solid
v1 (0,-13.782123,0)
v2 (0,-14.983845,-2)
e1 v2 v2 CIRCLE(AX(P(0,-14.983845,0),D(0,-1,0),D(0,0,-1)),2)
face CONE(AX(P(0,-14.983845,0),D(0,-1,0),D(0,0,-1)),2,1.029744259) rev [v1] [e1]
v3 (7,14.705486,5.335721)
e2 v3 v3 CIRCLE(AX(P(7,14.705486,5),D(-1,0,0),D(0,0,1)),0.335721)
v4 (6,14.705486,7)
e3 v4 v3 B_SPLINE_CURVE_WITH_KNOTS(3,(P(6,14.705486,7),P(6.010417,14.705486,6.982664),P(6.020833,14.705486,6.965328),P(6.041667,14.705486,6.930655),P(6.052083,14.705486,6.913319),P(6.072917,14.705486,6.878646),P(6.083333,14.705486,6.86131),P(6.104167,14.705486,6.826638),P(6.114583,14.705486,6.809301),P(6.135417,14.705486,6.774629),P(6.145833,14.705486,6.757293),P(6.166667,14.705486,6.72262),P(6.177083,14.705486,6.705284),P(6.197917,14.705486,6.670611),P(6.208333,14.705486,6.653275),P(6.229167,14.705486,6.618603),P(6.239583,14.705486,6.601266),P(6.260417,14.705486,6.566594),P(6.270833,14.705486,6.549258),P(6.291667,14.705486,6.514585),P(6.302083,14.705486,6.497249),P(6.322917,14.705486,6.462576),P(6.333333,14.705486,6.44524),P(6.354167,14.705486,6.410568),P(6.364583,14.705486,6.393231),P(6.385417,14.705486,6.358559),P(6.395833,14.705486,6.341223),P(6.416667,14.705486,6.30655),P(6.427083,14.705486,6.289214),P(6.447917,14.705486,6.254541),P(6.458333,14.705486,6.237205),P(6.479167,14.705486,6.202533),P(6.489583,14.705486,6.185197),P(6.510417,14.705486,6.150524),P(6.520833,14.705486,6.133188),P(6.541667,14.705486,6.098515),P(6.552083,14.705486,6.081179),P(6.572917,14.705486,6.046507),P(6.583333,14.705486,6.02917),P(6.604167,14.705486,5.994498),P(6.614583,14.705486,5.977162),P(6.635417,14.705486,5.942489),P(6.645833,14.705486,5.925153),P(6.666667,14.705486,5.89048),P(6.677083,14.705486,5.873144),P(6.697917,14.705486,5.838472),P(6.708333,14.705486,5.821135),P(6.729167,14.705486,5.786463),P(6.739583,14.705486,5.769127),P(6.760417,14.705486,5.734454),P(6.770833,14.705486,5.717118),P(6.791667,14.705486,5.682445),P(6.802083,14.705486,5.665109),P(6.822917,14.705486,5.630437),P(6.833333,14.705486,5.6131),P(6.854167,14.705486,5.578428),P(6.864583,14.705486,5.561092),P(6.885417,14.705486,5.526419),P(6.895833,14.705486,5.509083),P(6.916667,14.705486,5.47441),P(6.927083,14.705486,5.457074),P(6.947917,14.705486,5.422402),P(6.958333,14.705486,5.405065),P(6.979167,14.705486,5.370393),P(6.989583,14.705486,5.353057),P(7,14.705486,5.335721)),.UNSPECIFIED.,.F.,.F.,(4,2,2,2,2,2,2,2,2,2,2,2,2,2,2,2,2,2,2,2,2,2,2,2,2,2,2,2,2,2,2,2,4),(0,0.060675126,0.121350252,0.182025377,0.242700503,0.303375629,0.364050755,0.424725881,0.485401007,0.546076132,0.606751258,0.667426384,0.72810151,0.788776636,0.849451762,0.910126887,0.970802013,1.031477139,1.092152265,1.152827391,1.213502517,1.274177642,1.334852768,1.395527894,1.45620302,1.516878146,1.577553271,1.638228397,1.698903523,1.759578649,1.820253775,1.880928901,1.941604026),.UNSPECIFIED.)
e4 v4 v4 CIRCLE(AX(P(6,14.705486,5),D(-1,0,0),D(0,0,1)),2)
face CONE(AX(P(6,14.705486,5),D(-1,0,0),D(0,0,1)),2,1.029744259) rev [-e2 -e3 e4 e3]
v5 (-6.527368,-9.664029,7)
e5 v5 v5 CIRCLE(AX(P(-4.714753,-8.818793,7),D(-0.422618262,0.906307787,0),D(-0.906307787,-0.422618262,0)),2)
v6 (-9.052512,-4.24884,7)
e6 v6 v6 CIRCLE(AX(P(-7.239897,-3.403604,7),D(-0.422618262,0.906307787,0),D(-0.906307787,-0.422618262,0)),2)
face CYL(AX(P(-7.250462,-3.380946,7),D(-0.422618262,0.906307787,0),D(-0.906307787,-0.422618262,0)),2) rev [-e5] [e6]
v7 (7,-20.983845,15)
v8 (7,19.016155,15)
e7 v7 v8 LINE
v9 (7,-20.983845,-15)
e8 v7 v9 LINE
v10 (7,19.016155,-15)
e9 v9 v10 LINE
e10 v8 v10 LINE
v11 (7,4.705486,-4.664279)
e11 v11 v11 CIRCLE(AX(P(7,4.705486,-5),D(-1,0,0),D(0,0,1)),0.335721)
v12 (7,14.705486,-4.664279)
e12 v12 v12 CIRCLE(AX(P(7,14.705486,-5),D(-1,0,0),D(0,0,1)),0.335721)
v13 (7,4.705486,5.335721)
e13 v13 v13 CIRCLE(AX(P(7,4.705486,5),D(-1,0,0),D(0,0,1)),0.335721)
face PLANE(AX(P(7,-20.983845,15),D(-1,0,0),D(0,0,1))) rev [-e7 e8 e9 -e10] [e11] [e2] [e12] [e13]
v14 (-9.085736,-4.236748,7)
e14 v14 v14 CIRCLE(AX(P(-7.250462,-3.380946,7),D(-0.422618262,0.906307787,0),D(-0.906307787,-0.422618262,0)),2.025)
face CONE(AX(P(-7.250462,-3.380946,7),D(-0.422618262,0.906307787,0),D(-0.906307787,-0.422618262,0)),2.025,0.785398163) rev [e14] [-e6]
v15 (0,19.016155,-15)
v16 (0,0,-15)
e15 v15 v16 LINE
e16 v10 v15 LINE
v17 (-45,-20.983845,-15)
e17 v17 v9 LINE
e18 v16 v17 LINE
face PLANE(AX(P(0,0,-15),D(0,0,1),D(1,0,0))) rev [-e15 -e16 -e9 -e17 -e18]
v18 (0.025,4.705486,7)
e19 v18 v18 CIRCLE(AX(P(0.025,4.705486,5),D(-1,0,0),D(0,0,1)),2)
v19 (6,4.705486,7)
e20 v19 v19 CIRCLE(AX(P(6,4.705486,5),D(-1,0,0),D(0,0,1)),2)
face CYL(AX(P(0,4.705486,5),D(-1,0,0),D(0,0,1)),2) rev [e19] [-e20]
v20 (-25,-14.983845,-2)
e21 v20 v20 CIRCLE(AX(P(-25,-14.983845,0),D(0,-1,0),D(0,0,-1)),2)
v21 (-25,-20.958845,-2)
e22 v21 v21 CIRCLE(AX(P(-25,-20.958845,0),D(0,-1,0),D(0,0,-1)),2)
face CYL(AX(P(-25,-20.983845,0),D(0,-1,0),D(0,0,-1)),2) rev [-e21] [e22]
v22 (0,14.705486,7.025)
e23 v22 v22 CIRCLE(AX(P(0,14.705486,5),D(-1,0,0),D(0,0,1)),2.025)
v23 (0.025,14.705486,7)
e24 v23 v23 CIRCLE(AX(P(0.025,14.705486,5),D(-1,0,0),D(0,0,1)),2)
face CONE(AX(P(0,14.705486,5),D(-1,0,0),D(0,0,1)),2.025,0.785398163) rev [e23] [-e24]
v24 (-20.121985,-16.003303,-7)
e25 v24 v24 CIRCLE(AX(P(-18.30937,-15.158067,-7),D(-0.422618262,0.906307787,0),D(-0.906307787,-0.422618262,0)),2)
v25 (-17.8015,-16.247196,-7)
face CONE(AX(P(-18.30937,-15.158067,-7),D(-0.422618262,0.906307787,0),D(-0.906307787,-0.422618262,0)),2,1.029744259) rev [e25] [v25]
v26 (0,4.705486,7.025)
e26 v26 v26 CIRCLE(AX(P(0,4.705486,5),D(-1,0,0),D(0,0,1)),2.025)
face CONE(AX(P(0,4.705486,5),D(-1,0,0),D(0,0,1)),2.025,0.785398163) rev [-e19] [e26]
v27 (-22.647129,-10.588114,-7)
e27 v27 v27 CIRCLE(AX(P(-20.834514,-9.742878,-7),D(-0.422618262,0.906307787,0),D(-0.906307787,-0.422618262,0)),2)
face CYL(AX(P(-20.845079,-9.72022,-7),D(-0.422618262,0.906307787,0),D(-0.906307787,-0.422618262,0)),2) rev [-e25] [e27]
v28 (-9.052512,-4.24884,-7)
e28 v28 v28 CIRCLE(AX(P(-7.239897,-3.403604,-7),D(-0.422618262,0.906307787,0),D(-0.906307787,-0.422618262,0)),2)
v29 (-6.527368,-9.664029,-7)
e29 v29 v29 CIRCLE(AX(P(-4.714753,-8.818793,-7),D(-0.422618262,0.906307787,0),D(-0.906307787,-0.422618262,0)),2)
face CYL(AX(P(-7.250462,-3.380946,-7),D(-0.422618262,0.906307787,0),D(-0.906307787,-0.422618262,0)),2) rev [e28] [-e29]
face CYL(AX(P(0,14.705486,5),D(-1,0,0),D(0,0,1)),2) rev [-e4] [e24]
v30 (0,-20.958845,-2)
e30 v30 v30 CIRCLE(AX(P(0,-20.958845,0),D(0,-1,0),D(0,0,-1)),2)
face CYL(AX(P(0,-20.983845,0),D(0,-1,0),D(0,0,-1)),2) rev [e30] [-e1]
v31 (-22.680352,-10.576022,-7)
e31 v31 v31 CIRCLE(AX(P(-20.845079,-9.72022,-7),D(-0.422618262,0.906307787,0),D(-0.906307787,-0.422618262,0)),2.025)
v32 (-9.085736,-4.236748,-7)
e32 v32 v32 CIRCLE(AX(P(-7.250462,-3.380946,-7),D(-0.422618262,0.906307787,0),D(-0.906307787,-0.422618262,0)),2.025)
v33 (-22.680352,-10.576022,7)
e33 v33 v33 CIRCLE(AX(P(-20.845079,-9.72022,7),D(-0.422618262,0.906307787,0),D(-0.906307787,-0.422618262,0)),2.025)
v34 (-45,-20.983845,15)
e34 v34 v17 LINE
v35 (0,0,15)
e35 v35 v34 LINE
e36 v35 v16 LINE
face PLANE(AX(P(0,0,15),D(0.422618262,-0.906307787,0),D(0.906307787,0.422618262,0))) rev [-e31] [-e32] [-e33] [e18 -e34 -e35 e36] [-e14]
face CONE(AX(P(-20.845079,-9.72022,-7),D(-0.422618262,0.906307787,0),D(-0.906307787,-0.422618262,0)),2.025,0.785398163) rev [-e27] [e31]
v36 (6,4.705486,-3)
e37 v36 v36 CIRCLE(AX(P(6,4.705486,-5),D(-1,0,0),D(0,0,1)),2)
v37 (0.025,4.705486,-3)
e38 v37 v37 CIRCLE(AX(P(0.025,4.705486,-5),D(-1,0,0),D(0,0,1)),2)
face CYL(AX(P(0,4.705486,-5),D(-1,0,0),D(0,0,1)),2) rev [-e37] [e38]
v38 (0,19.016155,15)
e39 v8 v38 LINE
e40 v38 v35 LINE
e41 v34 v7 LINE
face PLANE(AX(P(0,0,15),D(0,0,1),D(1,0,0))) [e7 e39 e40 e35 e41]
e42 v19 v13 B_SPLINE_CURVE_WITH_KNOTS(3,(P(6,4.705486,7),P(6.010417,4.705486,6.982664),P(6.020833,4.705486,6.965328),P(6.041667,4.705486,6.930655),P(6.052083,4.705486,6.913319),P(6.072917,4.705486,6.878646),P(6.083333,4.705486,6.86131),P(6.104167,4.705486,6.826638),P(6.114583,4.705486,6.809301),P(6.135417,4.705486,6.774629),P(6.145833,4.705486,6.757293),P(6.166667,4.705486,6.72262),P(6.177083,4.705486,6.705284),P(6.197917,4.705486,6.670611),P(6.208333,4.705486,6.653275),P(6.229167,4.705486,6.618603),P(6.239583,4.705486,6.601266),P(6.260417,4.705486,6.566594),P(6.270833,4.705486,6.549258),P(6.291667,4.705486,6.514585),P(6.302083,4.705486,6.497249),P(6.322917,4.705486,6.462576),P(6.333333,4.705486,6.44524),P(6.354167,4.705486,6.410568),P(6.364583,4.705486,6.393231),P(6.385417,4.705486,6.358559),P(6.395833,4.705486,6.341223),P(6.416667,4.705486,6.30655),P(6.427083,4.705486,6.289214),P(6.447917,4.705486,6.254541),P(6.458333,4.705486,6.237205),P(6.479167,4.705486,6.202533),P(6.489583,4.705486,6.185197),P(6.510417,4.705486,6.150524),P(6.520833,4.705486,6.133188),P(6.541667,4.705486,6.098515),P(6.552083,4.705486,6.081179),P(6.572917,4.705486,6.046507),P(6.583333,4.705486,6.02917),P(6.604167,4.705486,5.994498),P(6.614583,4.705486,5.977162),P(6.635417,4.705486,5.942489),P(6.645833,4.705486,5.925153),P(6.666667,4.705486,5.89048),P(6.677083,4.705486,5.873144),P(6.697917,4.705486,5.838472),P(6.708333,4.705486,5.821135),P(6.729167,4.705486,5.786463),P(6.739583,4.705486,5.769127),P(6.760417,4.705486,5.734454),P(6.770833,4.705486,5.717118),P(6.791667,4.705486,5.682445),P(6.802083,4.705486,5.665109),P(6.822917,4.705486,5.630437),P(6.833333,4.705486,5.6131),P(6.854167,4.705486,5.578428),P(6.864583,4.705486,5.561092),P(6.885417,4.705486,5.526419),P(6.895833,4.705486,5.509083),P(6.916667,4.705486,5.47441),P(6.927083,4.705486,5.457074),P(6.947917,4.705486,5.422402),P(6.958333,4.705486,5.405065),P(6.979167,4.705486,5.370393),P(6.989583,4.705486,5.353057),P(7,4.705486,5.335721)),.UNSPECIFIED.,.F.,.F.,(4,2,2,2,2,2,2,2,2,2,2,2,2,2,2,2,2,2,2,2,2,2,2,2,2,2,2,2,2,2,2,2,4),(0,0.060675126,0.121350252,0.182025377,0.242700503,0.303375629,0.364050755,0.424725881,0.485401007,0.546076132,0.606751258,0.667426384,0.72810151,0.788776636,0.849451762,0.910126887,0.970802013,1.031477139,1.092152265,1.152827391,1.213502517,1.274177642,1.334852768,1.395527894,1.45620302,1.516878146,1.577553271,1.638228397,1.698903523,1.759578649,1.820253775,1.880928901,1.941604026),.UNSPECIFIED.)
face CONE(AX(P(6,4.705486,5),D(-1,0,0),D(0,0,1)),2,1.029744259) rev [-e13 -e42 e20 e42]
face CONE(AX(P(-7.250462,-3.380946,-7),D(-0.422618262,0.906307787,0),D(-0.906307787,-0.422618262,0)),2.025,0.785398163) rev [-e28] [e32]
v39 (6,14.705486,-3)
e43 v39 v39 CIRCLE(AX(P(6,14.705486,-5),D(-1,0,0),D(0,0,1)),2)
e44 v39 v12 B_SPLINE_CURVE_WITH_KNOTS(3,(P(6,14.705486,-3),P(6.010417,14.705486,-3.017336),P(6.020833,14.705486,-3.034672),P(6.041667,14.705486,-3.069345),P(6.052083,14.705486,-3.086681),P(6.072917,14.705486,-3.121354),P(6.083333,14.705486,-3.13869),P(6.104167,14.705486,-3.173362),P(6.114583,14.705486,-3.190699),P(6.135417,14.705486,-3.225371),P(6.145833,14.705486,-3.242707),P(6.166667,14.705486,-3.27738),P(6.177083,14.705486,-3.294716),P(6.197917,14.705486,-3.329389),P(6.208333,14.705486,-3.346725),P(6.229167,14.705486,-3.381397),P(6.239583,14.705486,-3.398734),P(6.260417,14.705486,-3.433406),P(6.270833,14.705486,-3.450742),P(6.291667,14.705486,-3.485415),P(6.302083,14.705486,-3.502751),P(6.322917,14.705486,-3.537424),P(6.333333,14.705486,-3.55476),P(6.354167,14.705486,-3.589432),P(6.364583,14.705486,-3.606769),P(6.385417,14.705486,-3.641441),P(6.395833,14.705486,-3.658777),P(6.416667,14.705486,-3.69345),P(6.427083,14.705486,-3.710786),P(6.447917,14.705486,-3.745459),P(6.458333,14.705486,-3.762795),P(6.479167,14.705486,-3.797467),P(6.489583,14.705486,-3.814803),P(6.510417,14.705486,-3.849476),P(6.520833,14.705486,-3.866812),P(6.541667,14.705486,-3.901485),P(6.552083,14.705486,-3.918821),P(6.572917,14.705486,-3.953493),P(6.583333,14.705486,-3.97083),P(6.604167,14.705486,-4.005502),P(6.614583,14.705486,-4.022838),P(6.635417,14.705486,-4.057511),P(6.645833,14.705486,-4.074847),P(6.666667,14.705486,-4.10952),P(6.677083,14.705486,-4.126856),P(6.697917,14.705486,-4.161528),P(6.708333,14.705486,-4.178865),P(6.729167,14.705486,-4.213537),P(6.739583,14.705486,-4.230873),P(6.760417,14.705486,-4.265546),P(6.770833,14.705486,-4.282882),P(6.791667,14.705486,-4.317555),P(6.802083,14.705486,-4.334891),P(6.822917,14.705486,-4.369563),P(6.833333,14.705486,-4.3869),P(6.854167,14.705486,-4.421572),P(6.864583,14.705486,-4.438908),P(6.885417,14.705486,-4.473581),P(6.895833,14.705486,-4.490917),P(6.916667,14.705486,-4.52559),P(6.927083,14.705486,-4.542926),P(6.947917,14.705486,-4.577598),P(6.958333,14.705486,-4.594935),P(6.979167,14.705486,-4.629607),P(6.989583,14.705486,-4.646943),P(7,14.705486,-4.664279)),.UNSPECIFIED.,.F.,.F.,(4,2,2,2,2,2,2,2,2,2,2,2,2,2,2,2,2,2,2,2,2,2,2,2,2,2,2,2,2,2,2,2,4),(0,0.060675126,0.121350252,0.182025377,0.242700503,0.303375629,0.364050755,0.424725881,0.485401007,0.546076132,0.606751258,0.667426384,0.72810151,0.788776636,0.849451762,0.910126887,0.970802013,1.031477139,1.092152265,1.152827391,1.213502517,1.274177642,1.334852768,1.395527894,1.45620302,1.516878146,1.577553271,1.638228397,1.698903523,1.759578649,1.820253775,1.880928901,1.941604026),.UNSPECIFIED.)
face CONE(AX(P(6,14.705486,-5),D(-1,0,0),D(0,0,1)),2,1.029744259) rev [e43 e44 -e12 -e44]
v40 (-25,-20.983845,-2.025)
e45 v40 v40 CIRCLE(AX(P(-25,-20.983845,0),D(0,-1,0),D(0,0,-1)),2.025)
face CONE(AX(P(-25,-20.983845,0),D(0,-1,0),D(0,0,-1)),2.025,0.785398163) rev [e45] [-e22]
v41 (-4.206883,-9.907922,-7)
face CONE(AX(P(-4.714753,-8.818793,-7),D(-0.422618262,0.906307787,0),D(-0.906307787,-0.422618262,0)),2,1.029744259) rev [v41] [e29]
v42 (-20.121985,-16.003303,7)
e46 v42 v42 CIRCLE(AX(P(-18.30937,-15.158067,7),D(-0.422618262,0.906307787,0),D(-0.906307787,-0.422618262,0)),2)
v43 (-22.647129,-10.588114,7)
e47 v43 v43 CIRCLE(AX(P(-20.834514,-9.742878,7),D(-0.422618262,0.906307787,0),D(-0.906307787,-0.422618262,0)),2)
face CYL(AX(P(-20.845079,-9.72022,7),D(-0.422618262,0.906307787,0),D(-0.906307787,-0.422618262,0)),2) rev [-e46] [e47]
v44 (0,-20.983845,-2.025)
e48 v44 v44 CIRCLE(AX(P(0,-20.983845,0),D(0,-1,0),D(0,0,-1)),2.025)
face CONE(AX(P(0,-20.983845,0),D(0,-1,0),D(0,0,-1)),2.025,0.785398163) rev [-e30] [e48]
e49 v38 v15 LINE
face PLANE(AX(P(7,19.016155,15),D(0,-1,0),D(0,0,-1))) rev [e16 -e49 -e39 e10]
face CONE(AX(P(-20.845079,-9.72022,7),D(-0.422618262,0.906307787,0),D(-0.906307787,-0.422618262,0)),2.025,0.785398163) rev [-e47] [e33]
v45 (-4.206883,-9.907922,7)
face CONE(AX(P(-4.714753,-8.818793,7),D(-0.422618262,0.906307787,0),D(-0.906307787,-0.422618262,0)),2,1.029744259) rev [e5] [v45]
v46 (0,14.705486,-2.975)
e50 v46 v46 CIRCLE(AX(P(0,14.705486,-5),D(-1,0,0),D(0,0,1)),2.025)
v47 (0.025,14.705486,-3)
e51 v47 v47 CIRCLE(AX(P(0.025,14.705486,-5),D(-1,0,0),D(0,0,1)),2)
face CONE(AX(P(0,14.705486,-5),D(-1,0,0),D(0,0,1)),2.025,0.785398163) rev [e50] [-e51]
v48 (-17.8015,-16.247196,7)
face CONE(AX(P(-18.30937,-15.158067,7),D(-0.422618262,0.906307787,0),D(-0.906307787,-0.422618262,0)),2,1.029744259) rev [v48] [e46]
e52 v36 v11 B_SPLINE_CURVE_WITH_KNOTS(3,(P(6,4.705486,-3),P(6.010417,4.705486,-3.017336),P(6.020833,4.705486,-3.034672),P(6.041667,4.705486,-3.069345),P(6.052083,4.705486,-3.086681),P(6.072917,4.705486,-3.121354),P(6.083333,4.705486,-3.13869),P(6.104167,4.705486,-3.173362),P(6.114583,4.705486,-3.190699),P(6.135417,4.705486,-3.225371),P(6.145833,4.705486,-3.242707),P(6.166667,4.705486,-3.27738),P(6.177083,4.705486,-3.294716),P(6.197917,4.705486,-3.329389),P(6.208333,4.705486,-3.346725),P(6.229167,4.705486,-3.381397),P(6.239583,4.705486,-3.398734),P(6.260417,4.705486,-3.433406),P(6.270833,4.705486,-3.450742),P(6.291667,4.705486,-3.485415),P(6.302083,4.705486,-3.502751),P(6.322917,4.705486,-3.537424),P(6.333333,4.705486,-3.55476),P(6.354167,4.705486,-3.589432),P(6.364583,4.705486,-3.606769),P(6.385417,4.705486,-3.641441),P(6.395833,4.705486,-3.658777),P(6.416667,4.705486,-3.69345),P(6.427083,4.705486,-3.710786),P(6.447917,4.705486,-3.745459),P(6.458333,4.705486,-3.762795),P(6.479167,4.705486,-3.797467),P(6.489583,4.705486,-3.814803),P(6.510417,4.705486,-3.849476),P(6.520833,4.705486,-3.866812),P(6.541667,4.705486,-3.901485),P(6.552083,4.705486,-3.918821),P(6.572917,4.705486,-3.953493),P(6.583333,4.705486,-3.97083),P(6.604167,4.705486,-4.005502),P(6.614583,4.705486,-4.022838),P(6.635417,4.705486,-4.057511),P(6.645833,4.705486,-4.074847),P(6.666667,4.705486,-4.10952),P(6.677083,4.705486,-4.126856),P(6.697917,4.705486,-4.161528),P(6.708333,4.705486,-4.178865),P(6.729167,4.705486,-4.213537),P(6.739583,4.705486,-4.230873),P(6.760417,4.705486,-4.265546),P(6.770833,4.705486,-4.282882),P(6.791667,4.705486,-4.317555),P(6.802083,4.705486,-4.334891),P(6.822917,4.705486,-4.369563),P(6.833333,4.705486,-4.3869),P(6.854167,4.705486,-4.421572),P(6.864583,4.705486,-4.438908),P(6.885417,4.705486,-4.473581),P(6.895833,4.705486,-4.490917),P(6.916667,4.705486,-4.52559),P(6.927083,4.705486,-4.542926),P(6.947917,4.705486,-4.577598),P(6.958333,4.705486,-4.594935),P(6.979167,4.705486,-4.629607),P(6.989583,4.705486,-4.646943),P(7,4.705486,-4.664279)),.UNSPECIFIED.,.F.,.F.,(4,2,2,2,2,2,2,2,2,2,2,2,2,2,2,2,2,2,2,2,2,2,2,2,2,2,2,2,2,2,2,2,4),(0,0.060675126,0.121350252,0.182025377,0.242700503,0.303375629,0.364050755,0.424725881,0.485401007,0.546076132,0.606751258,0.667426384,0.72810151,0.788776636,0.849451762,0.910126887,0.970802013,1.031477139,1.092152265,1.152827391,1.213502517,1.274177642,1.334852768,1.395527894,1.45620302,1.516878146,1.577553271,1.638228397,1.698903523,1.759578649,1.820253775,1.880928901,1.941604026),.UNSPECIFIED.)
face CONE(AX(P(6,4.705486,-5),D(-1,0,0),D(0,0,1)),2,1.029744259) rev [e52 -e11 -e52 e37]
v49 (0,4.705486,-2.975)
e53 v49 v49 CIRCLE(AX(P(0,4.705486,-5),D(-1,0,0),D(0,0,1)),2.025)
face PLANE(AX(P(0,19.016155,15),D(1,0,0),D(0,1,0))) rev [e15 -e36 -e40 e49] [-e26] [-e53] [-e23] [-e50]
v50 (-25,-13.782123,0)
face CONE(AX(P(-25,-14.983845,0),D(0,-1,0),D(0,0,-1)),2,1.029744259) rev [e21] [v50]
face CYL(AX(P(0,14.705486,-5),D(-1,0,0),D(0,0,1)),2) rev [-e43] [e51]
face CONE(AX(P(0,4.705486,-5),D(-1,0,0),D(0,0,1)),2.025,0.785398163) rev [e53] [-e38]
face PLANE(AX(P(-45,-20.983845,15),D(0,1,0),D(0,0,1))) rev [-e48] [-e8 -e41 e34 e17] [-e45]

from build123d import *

# Parameters (mm, degrees)
BOSS_EXTRUDE1_DEPTH             = 15
F_4_0MM_DOWEL_HOLE1_D           = 4
F_4_0MM_DOWEL_HOLE1_DEPTH       = 6
F_4_0MM_DOWEL_HOLE1_CSINK_D     = 4.05
F_4_0MM_DOWEL_HOLE1_CSINK_ANGLE = 90
F_4_0MM_DOWEL_HOLE1_TIP         = 1.201721238
F_4_0MM_DOWEL_HOLE3_D           = 4
F_4_0MM_DOWEL_HOLE3_DEPTH       = 6
F_4_0MM_DOWEL_HOLE3_CSINK_D     = 4.05
F_4_0MM_DOWEL_HOLE3_CSINK_ANGLE = 90
F_4_0MM_DOWEL_HOLE3_TIP         = 1.201721238


# Read off the part's stored shape, not the designer's step: Ø4.0mm Dowel Hole4
with BuildPart() as part:
    # Sketch1 → Boss-Extrude1 (new, symmetric)
    with BuildSketch(Plane.XY):
        Polygon((0, 19.016155383), (0, 0), (-45, -20.983844617), (7, -20.983844617), (7, 19.016155383), align=None)
    extrude(amount=BOSS_EXTRUDE1_DEPTH, both=True)

    # Ø4.0mm Dowel Hole1
    with Locations(Plane(origin=(0, -20.983844617, 0), x_dir=(-1, 0, 0), z_dir=(0, -1, 0))):
        with Locations((0, 0), (25, 0)):
            CounterSinkHole(F_4_0MM_DOWEL_HOLE1_D / 2, F_4_0MM_DOWEL_HOLE1_CSINK_D / 2, depth=F_4_0MM_DOWEL_HOLE1_DEPTH, counter_sink_angle=F_4_0MM_DOWEL_HOLE1_CSINK_ANGLE)
            with Locations((0, 0, -(F_4_0MM_DOWEL_HOLE1_DEPTH + F_4_0MM_DOWEL_HOLE1_TIP / 2))):  # 118° drill point
                Cone(0, F_4_0MM_DOWEL_HOLE1_D / 2, F_4_0MM_DOWEL_HOLE1_TIP, mode=Mode.SUBTRACT)

    # Ø4.0mm Dowel Hole3
    with Locations(Plane(origin=(0, 0, 0), x_dir=(0.9063077870366525, 0.422618261740694, 0), z_dir=(-0.422618261740694, 0.9063077870366525, 0))):
        with Locations((-23, 7), (-8, 7), (-8, -7), (-23, -7)):
            CounterSinkHole(F_4_0MM_DOWEL_HOLE3_D / 2, F_4_0MM_DOWEL_HOLE3_CSINK_D / 2, depth=F_4_0MM_DOWEL_HOLE3_DEPTH, counter_sink_angle=F_4_0MM_DOWEL_HOLE3_CSINK_ANGLE)
            with Locations((0, 0, -(F_4_0MM_DOWEL_HOLE3_DEPTH + F_4_0MM_DOWEL_HOLE3_TIP / 2))):  # 118° drill point
                Cone(0, F_4_0MM_DOWEL_HOLE3_D / 2, F_4_0MM_DOWEL_HOLE3_TIP, mode=Mode.SUBTRACT)

    # Ø4.0mm Dowel Hole4 outline → Ø4.0mm Dowel Hole4 (revolve, cut)
    with BuildSketch(Plane(origin=(0, 4.705485654, 5), x_dir=(0, 1, 0), z_dir=(0, 0, -1))):
        Polygon((0, 0), (2.025, 0), (2, 0.025), (2, 6), (0.335720518, 7), (0, 7), align=None)
    revolve(axis=Axis((0, 4.705485654, 5), (1, 0, 0)), mode=Mode.SUBTRACT)

    # 4.0mm Dowel Hole4 2 outline → 4.0mm Dowel Hole4 2 (revolve, cut)
    with BuildSketch(Plane(origin=(0, 14.705485654, -5), x_dir=(0, 1, 0), z_dir=(0, 0, -1))):
        Polygon((0, 0), (2.025, 0), (2, 0.025), (2, 6), (0.335720518, 7), (0, 7), align=None)
    revolve(axis=Axis((0, 14.705485654, -5), (1, 0, 0)), mode=Mode.SUBTRACT)

    # 4.0mm Dowel Hole4 3 outline → 4.0mm Dowel Hole4 3 (revolve, cut)
    with BuildSketch(Plane(origin=(0, 4.705485654, -5), x_dir=(0, 1, 0), z_dir=(0, 0, -1))):
        Polygon((0, 0), (2.025, 0), (2, 0.025), (2, 6), (0.335720518, 7), (0, 7), align=None)
    revolve(axis=Axis((0, 4.705485654, -5), (1, 0, 0)), mode=Mode.SUBTRACT)

    # 4.0mm Dowel Hole4 4 outline → 4.0mm Dowel Hole4 4 (revolve, cut)
    with BuildSketch(Plane(origin=(0, 14.705485654, 5), x_dir=(0, 1, 0), z_dir=(0, 0, -1))):
        Polygon((0, 0), (2.025, 0), (2, 0.025), (2, 6), (0.335720518, 7), (0, 7), align=None)
    revolve(axis=Axis((0, 14.705485654, 5), (1, 0, 0)), mode=Mode.SUBTRACT)


solid = part.part
